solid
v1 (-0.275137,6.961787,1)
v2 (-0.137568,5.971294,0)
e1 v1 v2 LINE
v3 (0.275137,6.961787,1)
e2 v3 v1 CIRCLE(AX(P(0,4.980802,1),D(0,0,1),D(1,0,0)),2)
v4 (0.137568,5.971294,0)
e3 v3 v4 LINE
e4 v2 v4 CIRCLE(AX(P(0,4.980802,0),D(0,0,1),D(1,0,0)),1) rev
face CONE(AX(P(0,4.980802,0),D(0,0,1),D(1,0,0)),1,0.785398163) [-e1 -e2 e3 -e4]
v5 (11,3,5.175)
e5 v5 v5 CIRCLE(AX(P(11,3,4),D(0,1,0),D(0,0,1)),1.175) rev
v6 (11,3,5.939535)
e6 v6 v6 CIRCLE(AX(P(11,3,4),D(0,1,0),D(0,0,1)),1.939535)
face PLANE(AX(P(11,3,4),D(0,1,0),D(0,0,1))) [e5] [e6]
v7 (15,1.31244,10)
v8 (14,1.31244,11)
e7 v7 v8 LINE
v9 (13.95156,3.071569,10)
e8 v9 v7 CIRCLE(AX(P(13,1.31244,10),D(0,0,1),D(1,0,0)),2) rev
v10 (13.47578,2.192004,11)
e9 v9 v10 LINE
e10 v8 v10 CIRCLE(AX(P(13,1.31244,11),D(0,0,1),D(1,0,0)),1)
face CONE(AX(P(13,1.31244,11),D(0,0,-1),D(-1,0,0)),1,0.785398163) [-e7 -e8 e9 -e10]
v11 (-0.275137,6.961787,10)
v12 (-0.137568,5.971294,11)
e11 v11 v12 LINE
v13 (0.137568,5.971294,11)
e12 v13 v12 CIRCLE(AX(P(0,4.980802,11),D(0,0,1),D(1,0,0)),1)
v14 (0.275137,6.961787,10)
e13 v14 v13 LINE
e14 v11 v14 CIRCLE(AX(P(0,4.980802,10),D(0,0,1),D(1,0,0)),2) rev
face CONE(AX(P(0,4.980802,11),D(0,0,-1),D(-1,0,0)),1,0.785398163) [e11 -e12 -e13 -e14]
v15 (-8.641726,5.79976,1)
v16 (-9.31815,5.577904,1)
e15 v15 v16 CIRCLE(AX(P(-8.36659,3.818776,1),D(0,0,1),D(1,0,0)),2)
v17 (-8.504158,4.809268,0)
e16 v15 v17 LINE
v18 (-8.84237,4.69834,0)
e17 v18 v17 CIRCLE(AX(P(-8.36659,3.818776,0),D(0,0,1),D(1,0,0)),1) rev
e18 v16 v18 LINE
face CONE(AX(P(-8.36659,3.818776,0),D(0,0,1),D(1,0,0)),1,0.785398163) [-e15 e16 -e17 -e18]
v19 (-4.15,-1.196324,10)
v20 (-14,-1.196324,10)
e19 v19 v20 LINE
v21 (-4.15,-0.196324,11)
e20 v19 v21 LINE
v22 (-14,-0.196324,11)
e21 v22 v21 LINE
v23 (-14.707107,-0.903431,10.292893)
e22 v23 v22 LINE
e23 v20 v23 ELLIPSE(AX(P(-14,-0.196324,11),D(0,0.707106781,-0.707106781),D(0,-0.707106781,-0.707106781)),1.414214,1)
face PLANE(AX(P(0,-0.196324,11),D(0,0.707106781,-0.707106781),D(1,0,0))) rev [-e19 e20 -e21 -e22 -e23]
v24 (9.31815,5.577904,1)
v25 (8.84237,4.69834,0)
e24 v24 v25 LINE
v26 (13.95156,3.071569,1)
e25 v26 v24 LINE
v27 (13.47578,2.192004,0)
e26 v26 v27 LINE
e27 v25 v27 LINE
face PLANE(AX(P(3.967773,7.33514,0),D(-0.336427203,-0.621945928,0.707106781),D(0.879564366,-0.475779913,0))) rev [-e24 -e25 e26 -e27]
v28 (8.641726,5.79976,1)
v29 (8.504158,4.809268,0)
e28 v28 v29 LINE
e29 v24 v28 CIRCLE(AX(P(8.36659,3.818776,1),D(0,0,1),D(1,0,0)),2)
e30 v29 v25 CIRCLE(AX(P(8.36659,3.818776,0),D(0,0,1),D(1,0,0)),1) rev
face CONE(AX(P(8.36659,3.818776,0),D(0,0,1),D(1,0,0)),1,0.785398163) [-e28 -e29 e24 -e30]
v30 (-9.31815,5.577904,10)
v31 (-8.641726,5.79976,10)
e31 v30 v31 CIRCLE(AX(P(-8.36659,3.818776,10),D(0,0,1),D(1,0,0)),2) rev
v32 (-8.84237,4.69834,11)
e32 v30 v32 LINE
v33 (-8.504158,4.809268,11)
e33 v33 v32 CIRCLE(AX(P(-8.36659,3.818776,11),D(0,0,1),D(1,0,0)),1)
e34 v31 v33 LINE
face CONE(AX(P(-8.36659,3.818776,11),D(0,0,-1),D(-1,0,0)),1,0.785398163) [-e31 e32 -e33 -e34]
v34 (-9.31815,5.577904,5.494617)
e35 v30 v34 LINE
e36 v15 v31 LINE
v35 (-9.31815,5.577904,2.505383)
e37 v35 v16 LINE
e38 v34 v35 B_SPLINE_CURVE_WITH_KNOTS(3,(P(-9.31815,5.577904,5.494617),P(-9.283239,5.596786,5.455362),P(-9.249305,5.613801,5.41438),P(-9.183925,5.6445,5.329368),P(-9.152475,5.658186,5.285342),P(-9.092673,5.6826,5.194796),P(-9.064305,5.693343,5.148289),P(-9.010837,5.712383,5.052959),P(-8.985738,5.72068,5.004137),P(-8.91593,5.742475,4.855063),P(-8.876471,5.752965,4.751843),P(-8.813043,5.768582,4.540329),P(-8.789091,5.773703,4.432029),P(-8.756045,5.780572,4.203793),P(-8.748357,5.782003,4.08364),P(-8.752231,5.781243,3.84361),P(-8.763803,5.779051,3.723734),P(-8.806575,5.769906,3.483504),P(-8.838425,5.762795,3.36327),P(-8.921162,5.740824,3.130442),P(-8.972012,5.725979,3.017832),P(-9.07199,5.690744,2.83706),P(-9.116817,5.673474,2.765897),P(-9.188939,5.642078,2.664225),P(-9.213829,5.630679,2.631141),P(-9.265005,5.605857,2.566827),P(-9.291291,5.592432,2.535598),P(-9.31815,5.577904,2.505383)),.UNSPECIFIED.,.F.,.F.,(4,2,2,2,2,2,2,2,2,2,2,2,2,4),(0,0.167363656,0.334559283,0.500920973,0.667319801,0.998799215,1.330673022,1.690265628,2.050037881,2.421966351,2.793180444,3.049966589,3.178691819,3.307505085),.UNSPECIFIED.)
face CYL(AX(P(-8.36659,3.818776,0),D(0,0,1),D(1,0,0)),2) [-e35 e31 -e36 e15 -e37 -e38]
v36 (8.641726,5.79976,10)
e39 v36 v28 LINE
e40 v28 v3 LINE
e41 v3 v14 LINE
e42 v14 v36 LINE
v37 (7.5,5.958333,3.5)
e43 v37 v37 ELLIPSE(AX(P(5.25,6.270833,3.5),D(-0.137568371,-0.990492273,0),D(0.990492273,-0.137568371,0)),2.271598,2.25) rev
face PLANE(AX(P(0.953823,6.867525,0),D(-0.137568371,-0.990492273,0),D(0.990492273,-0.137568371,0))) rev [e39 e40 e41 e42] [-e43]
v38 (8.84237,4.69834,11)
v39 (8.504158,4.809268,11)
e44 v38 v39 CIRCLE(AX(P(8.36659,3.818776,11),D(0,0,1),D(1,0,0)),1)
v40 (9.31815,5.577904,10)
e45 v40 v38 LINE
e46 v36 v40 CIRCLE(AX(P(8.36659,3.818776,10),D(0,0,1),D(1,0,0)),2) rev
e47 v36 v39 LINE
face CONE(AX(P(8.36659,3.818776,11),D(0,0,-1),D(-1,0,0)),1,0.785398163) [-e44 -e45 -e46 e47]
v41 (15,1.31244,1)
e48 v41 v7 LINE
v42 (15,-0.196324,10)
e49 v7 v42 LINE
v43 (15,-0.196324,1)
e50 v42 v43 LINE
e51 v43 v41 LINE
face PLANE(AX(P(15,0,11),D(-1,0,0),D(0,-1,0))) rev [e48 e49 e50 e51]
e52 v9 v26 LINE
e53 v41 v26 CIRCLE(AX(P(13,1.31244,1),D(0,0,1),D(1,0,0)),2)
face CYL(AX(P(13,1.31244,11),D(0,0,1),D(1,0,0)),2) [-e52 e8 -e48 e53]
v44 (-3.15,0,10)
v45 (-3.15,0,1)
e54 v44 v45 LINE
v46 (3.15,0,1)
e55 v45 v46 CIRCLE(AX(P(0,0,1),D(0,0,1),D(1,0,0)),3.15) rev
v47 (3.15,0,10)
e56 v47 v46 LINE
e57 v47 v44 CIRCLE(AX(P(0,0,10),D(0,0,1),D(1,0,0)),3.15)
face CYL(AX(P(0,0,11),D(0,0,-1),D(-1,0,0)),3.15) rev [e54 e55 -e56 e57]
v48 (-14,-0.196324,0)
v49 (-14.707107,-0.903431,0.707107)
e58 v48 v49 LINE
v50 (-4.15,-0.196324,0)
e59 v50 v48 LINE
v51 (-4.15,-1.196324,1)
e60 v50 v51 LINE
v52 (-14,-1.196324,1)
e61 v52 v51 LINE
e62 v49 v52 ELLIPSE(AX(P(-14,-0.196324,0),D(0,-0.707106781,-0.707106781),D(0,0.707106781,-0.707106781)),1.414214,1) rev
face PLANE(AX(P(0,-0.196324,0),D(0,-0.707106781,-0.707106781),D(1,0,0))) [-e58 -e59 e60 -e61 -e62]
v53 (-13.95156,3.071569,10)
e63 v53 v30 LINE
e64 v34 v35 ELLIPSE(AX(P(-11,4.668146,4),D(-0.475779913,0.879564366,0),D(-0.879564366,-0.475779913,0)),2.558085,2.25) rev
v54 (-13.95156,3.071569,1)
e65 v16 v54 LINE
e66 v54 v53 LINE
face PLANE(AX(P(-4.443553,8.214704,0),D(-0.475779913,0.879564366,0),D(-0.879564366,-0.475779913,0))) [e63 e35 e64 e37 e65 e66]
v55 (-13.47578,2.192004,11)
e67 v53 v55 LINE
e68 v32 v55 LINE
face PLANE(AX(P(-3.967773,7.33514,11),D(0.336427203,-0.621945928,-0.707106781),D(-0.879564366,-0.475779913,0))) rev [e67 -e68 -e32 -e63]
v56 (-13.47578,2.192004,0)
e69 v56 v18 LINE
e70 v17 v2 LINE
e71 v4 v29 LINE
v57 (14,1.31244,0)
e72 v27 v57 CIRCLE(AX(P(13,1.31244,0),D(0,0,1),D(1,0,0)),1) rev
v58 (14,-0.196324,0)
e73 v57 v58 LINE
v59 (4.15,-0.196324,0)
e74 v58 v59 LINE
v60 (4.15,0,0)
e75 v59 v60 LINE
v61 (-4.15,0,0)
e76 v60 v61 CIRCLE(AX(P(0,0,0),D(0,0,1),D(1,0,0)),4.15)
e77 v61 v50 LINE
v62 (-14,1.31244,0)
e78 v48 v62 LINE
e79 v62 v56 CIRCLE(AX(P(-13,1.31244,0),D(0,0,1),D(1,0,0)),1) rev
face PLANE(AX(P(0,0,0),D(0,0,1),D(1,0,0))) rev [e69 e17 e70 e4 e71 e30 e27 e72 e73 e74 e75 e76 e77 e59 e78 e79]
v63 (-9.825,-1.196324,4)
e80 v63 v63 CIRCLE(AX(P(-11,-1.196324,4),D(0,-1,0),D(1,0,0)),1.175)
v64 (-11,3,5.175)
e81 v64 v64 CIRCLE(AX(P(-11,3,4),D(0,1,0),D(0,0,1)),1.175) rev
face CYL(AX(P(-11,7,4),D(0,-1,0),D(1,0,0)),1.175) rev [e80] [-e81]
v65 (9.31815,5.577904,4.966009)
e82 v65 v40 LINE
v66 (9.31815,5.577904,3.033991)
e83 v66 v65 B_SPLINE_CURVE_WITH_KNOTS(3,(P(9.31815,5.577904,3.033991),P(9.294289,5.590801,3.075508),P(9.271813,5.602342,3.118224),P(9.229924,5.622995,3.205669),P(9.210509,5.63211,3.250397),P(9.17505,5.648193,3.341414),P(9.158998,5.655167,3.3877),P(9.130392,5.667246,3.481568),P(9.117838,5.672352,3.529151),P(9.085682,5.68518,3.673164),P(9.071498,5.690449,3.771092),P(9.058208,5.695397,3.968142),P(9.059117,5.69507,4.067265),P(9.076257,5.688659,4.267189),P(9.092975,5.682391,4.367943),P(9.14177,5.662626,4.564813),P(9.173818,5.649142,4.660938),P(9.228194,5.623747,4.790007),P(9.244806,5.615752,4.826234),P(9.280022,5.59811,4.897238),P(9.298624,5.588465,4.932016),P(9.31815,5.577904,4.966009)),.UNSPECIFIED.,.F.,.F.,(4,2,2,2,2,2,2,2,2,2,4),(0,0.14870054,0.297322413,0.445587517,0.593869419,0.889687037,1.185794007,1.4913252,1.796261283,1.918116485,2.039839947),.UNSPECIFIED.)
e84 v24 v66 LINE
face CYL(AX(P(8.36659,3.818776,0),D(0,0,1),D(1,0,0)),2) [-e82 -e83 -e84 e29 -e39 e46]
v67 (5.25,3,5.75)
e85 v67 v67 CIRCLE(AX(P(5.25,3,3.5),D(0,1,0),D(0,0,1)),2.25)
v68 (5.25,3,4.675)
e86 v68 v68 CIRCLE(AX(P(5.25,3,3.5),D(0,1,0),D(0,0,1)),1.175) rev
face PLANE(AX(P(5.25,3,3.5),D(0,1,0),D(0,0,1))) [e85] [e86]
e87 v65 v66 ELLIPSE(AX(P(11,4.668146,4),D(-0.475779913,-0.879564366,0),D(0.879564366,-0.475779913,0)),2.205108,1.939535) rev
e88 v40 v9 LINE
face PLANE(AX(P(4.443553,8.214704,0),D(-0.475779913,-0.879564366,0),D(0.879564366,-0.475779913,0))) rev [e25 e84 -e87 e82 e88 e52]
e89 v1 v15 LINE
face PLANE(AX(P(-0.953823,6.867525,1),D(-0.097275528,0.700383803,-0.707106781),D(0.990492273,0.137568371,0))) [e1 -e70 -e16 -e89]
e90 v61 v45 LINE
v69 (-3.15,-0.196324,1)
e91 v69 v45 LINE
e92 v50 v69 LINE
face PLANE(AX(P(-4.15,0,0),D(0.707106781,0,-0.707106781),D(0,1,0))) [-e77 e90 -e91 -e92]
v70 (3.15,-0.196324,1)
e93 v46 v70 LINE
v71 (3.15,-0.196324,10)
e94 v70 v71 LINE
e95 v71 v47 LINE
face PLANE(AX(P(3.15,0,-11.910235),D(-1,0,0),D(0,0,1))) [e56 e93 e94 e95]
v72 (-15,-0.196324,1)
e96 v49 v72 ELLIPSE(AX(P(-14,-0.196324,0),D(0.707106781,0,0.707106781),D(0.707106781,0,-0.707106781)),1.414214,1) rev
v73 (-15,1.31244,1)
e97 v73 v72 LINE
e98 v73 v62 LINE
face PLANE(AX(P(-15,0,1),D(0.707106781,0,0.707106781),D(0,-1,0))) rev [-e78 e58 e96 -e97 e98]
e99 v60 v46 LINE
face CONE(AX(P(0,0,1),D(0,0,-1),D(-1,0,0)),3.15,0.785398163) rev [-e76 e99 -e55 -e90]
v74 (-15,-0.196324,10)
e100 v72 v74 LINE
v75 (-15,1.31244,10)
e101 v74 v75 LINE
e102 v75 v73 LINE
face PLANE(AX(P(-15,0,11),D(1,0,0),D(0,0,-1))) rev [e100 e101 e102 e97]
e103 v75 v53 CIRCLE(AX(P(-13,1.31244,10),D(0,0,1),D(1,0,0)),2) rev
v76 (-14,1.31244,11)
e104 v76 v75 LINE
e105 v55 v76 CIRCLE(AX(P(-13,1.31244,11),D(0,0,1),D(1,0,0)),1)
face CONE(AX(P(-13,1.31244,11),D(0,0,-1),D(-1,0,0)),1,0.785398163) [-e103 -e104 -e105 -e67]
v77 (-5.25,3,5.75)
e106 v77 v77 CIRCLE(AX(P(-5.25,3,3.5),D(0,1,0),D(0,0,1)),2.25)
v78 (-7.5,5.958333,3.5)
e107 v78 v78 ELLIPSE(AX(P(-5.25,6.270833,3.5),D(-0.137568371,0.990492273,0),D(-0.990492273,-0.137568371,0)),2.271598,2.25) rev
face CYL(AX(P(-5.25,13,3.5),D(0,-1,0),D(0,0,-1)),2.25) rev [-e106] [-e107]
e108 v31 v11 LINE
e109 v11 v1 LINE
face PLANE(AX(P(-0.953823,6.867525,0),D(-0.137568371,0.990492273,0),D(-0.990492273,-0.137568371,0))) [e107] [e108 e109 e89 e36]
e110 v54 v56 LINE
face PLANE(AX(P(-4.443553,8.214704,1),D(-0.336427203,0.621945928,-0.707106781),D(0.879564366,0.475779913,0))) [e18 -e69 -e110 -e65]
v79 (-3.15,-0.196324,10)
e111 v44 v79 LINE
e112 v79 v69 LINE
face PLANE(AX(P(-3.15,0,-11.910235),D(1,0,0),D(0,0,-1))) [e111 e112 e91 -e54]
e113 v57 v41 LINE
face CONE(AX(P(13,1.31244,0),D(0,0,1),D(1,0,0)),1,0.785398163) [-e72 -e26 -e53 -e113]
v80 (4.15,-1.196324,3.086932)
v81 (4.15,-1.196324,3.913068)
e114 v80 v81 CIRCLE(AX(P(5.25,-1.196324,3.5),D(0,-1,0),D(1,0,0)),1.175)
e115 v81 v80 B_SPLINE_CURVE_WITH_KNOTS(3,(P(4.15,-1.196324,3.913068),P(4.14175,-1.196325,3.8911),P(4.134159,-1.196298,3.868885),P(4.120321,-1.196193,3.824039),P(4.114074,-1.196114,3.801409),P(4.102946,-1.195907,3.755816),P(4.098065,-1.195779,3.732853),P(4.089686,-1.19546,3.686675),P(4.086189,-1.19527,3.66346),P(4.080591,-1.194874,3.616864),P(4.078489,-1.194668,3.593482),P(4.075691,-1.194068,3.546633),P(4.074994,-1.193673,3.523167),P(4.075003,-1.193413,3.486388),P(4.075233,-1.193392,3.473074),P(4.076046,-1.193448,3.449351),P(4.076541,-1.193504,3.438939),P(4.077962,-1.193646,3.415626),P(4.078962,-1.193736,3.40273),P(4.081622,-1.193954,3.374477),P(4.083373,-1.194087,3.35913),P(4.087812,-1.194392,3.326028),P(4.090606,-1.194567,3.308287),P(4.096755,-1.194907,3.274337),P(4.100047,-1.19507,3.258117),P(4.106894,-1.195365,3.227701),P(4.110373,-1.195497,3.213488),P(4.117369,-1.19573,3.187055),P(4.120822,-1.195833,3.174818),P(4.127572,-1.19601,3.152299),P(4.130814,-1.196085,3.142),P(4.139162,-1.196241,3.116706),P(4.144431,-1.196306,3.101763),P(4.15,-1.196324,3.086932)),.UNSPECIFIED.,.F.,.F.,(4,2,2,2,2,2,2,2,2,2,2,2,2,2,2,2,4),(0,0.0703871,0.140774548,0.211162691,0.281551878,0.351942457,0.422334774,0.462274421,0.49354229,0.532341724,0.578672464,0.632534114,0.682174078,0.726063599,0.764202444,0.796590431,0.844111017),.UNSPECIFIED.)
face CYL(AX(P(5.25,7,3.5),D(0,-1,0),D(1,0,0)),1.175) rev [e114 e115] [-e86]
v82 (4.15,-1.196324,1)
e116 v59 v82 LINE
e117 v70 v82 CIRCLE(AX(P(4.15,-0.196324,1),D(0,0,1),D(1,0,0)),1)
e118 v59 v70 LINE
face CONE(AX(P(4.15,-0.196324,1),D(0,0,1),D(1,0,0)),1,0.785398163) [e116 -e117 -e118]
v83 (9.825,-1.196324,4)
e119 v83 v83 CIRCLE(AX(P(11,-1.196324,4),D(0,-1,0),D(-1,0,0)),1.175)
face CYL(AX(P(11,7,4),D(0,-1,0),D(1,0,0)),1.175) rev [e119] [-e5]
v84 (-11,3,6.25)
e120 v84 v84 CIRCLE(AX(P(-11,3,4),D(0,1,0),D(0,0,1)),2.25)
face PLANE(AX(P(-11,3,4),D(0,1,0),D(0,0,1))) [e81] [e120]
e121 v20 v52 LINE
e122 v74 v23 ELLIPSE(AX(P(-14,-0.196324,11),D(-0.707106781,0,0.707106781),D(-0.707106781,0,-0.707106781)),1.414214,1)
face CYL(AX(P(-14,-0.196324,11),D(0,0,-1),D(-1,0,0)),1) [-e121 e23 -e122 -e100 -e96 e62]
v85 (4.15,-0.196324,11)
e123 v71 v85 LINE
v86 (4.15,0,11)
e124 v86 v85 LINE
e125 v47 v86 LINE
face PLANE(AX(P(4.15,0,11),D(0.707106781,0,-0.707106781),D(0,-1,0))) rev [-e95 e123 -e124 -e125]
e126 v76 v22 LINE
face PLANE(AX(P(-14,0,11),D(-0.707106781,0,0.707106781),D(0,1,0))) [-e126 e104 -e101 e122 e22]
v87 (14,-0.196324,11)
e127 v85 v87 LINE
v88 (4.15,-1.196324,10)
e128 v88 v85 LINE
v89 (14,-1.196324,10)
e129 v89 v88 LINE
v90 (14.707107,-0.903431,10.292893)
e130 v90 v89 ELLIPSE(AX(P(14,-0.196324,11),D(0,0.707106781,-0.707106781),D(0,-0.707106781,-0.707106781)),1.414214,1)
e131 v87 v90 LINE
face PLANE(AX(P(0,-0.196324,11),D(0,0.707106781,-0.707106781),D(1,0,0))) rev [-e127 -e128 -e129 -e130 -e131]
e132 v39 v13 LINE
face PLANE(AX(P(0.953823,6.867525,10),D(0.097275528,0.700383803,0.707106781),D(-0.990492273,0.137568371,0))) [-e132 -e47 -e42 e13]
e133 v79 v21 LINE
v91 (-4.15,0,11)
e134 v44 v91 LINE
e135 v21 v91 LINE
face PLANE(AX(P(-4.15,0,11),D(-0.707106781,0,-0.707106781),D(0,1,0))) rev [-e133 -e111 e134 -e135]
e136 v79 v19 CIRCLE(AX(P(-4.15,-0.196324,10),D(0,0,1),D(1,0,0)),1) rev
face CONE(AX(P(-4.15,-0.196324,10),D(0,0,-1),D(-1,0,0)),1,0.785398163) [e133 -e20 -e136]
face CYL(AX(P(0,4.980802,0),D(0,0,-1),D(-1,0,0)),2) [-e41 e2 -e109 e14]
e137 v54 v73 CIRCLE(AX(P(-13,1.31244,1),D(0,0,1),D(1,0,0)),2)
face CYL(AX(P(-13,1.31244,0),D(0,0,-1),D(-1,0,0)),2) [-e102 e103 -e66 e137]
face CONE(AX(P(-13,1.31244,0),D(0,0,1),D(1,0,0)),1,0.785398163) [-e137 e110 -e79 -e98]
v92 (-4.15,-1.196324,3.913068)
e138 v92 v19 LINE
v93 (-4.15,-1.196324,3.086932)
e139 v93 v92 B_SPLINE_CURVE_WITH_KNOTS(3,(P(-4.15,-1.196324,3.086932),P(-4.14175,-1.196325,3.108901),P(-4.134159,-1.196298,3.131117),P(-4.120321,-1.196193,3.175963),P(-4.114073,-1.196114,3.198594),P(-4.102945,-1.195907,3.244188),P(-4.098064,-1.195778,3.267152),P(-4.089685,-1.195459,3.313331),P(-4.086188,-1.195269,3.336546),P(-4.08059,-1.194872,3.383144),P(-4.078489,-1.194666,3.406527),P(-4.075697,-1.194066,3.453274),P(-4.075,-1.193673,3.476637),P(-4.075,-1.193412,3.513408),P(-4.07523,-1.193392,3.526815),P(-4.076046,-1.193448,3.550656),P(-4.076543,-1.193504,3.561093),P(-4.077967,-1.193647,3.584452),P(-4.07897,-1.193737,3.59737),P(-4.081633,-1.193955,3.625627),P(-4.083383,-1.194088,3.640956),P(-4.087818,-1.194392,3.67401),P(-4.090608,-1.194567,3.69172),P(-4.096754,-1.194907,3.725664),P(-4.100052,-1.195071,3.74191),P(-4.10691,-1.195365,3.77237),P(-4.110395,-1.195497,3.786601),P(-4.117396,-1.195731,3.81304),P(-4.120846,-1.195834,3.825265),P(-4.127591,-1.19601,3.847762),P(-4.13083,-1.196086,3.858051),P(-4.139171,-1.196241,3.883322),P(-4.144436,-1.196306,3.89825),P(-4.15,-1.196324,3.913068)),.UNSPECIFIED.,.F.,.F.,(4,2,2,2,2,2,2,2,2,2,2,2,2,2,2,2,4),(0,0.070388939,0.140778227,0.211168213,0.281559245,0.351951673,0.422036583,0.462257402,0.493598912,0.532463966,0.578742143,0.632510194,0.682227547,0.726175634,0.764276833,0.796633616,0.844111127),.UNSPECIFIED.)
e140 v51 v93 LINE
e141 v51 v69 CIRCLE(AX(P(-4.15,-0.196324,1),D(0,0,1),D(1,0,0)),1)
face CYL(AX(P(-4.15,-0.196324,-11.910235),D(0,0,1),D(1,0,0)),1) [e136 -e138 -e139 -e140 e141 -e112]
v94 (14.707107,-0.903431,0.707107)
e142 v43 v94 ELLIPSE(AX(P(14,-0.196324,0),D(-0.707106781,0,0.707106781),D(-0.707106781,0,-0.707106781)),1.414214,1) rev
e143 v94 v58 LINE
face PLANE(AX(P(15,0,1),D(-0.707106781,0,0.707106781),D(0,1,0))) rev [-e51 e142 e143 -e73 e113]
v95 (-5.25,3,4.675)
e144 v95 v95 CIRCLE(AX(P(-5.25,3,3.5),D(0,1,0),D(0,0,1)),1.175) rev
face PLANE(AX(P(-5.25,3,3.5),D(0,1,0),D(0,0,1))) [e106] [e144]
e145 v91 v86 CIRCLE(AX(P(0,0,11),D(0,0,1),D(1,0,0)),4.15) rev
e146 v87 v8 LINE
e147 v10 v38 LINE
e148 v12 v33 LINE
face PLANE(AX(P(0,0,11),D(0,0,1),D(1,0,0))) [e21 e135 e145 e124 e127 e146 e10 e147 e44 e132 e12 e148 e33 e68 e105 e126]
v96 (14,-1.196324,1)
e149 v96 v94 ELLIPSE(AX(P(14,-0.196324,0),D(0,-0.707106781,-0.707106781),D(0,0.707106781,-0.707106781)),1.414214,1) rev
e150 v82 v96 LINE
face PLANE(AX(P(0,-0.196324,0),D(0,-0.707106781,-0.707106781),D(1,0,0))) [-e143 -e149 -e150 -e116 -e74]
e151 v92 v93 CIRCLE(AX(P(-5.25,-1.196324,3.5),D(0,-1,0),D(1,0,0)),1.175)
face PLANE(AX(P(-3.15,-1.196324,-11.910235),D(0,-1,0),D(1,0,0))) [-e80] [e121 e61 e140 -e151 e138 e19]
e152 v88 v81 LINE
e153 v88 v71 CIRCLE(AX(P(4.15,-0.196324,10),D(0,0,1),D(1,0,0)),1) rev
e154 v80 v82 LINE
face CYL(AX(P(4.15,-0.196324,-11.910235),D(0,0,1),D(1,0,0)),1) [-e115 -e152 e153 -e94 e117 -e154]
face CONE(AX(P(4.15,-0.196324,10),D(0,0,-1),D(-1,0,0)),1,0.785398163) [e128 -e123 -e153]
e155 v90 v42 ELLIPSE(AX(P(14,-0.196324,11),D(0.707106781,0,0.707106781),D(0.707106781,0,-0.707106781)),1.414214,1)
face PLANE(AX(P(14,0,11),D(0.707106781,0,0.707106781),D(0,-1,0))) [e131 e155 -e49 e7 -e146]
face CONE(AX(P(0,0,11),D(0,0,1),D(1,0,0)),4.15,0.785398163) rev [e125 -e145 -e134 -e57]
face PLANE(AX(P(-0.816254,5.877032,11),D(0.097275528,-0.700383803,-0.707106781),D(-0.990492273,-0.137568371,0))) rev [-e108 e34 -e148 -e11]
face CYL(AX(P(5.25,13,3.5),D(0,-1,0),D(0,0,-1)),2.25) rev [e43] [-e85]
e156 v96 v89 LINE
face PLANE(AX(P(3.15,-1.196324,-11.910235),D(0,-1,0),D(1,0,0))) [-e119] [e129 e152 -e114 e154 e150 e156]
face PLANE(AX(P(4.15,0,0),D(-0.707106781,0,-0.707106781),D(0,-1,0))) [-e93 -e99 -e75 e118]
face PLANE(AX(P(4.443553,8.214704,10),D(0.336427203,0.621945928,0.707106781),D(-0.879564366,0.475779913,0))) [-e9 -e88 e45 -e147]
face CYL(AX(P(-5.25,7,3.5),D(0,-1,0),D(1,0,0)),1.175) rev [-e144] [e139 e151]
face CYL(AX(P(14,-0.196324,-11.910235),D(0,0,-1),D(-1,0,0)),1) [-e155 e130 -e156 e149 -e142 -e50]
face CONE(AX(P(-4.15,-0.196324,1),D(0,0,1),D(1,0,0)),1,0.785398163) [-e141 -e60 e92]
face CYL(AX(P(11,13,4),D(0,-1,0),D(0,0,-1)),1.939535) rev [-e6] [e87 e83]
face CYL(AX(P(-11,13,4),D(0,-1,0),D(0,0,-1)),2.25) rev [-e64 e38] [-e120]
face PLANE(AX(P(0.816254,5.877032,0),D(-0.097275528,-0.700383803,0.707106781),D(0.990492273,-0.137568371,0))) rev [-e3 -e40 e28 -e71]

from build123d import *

# Parameters (mm, degrees)
BOSS_EXTRUDE1_DEPTH     = 11
CUT_EXTRUDE1_DEPTH      = 20.874606914
CUT_EXTRUDE1_DEPTH_BACK = 20.874606914
SKETCH3_W               = 11.85
SKETCH3_H               = 1.196323822
BOSS_EXTRUDE2_DEPTH     = 11
CHAMFER1_SIZE           = 1
FILLET1_R               = 1
SKETCH4_R               = 1.175
CUT_EXTRUDE2_DEPTH      = 21.326822777
CUT_EXTRUDE3_START      = 3
SKETCH5_R               = 2.25
SKETCH5_R_2             = 1.939534676
CUT_EXTRUDE3_DEPTH      = 10
FILLET2_R               = 2
FILLET3_R               = 1
CHAMFER2_SIZE           = 1


# Some blends are built 0.0001 mm under size
with BuildPart() as part:
    # Sketch1 → Boss-Extrude1 (new body)
    with BuildSketch(Plane.XY):
        with BuildLine():
            Line((-3.15, 0), (-15, 0))
            Line((-15, 0), (-15, 7))
            Line((-15, 7), (15, 7))
            Line((15, 7), (15, 0))
            Line((15, 0), (3.15, 0))
            ThreePointArc((3.15, 0), (0, 3.15), (-3.15, 0))
        make_face()
    extrude(amount=BOSS_EXTRUDE1_DEPTH)

    # Sketch2 → Cut-Extrude1 (cut, two sides: drawn at the far end of the back side and taken through both)
    with BuildSketch(Plane.XY.offset(11).offset(-CUT_EXTRUDE1_DEPTH_BACK)):
        Polygon((-9, 5.75), (0, 7), (-15, 7), (-15, 2.504439372), align=None)
        Polygon((15, 7), (0, 7), (9, 5.75), (15, 2.504439372), align=None)
    extrude(amount=CUT_EXTRUDE1_DEPTH + CUT_EXTRUDE1_DEPTH_BACK, mode=Mode.SUBTRACT)

    # Sketch3 → Boss-Extrude2 (add)
    with BuildSketch(Plane.XY.offset(11)):
        with Locations((-9.075, -0.598161911)):
            Rectangle(SKETCH3_W, SKETCH3_H)
        with Locations((9.075, -0.598161911)):
            Rectangle(SKETCH3_W, SKETCH3_H)
    extrude(amount=-BOSS_EXTRUDE2_DEPTH)

    # Chamfer1
    chamfer1_edges = [part.edges().sort_by_distance(p)[0] for p in [
        (15, 0.654057775, 11),
        (-15, 0.654057775, 0),
        (-15, 0.654057775, 11),
        (15, 0.654057775, 0),
    ]]
    chamfer(chamfer1_edges, length=CHAMFER1_SIZE)

    # Fillet1
    fillet1_edges = [part.edges().sort_by_distance(p)[0] for p in [
        (-3.15, -1.196323822, 5.5),
        (3.15, -1.196323822, 5.5),
    ]]
    fillet(fillet1_edges, radius=FILLET1_R)

    # Sketch4 → Cut-Extrude2 (cut, through all)
    with BuildSketch(Plane.XZ.offset(1.196323822)):
        with Locations(Location((-5.25, 3.5, 0), (0, 0, 20.581969212))):
            Circle(SKETCH4_R)
        with Locations((5.25, 3.5)):
            Circle(SKETCH4_R)
        with Locations((-11, 4)):
            Circle(SKETCH4_R)
        with Locations((11, 4)):
            Circle(SKETCH4_R)
    extrude(amount=-CUT_EXTRUDE2_DEPTH, mode=Mode.SUBTRACT)

    # Sketch5 → Cut-Extrude3 (cut)
    with BuildSketch(Plane(origin=(0, 0, 0), x_dir=(1, 0, 0), z_dir=(0, 1, 0)).offset(CUT_EXTRUDE3_START)):
        with Locations(Location((-5.25, -3.5, 0), (0, 0, 180))):
            Circle(SKETCH5_R)
        with Locations((5.25, -3.5)):
            Circle(SKETCH5_R)
        with Locations(Location((-11, -4, 0), (0, 0, 27.266044451))):
            Circle(SKETCH5_R)
        with Locations((11, -4)):
            Circle(SKETCH5_R_2)
    extrude(amount=CUT_EXTRUDE3_DEPTH, mode=Mode.SUBTRACT)

    # Fillet2
    # the kernel refuses this fillet: 2 mm, written as the material it takes off along each edge
    with BuildSketch(Plane(origin=(9, 5.75, -2.170275709), x_dir=(-0.9904922731777516, 0.13756837127468827, 0), z_dir=(0, 0, 1))) as fillet2_piece_1:
        with BuildLine():
            CenterArc((FILLET2_R * 0.180856309082, FILLET2_R), FILLET2_R, 249.497020474, 20.502979526)
            Line((-FILLET2_R * 0.169399781042, FILLET2_R * 0.0633460236933), (-FILLET2_R * 0.176404902844, FILLET2_R * 0.0446129441672))
            Line((-FILLET2_R * 0.176404902844, FILLET2_R * 0.0446129441672), (-FILLET2_R * 0.00361712618164, -FILLET2_R * 0.02))
            Line((-FILLET2_R * 0.00361712618164, -FILLET2_R * 0.02), (FILLET2_R * 0.180856309082, -FILLET2_R * 0.02))
            Line((FILLET2_R * 0.180856309082, -FILLET2_R * 0.02), (FILLET2_R * 0.180856309082, 0))
        make_face()
    extrude(amount=15.340551418, mode=Mode.SUBTRACT)
    with BuildSketch(Plane(origin=(-9, 5.75, 5.139499303), x_dir=(-0.879564366325619, -0.4757799128696085, 0), z_dir=(0, 0, -1))) as fillet2_piece_2:
        with BuildLine():
            CenterArc((FILLET2_R * 0.180856309082, -FILLET2_R), FILLET2_R, 90, 20.502979526)
            Line((-FILLET2_R * 0.169399781042, -FILLET2_R * 0.0633460236933), (-FILLET2_R * 0.176404902844, -FILLET2_R * 0.0446129441672))
            Line((-FILLET2_R * 0.176404902844, -FILLET2_R * 0.0446129441672), (-FILLET2_R * 0.00361712618164, FILLET2_R * 0.02))
            Line((-FILLET2_R * 0.00361712618164, FILLET2_R * 0.02), (FILLET2_R * 0.180856309082, FILLET2_R * 0.02))
            Line((FILLET2_R * 0.180856309082, FILLET2_R * 0.02), (FILLET2_R * 0.180856309082, 0))
        make_face()
    extrude(amount=7.309775012, mode=Mode.SUBTRACT)
    with BuildSketch(Plane(origin=(-9, 5.75, 13.170275709), x_dir=(-0.879564366325619, -0.4757799128696085, 0), z_dir=(0, 0, -1))) as fillet2_piece_3:
        with BuildLine():
            CenterArc((FILLET2_R * 0.180856309082, -FILLET2_R), FILLET2_R, 90, 20.502979526)
            Line((-FILLET2_R * 0.169399781042, -FILLET2_R * 0.0633460236933), (-FILLET2_R * 0.176404902844, -FILLET2_R * 0.0446129441672))
            Line((-FILLET2_R * 0.176404902844, -FILLET2_R * 0.0446129441672), (-FILLET2_R * 0.00361712618164, FILLET2_R * 0.02))
            Line((-FILLET2_R * 0.00361712618164, FILLET2_R * 0.02), (FILLET2_R * 0.180856309082, FILLET2_R * 0.02))
            Line((FILLET2_R * 0.180856309082, FILLET2_R * 0.02), (FILLET2_R * 0.180856309082, 0))
        make_face()
    extrude(amount=10.309775012, mode=Mode.SUBTRACT)
    with BuildSketch(Plane(origin=(0, 7, 12.666666667), x_dir=(-0.9904922731777517, -0.13756837127468774, 0), z_dir=(0, 0, -1))) as fillet2_piece_4:
        with BuildLine():
            CenterArc((FILLET2_R * 0.138888888889, -FILLET2_R), FILLET2_R, 90, 15.814325406)
            Line((-FILLET2_R * 0.133631928674, -FILLET2_R * 0.0378501135503), (-FILLET2_R * 0.139082345025, -FILLET2_R * 0.0186071158213))
            Line((-FILLET2_R * 0.139082345025, -FILLET2_R * 0.0186071158213), (-FILLET2_R * 0.00277777777778, FILLET2_R * 0.02))
            Line((-FILLET2_R * 0.00277777777778, FILLET2_R * 0.02), (FILLET2_R * 0.138888888889, FILLET2_R * 0.02))
            Line((FILLET2_R * 0.138888888889, FILLET2_R * 0.02), (FILLET2_R * 0.138888888889, 0))
        make_face()
    extrude(amount=14.333333333, mode=Mode.SUBTRACT)
    with BuildSketch(Plane(origin=(-15, 2.504439372, -6.151996245), x_dir=(0.8795643663256194, 0.4757799128696078, 0), z_dir=(0, 0, 1))) as fillet2_piece_5:
        with BuildLine():
            CenterArc((FILLET2_R * 0.595999687118, -FILLET2_R), FILLET2_R, 90, 61.589857771)
            Line((-FILLET2_R * 0.283564679207, -FILLET2_R * 0.52422008713), (-FILLET2_R * 0.301155966534, -FILLET2_R * 0.514704488873))
            Line((-FILLET2_R * 0.301155966534, -FILLET2_R * 0.514704488873), (-FILLET2_R * 0.0119199937424, FILLET2_R * 0.02))
            Line((-FILLET2_R * 0.0119199937424, FILLET2_R * 0.02), (FILLET2_R * 0.595999687118, FILLET2_R * 0.02))
            Line((FILLET2_R * 0.595999687118, FILLET2_R * 0.02), (FILLET2_R * 0.595999687118, 0))
        make_face()
    extrude(amount=23.303992491, mode=Mode.SUBTRACT)
    with BuildSketch(Plane(origin=(15, 2.504439372, -6.151996245), x_dir=(-0.87956436632562, 0.47577991286960686, 0), z_dir=(0, 0, 1))) as fillet2_piece_6:
        with BuildLine():
            CenterArc((FILLET2_R * 0.595999687118, FILLET2_R), FILLET2_R, 208.410142229, 61.589857771)
            Line((-FILLET2_R * 0.283564679207, FILLET2_R * 0.52422008713), (-FILLET2_R * 0.301155966534, FILLET2_R * 0.514704488873))
            Line((-FILLET2_R * 0.301155966534, FILLET2_R * 0.514704488873), (-FILLET2_R * 0.0119199937424, -FILLET2_R * 0.02))
            Line((-FILLET2_R * 0.0119199937424, -FILLET2_R * 0.02), (FILLET2_R * 0.595999687118, -FILLET2_R * 0.02))
            Line((FILLET2_R * 0.595999687118, -FILLET2_R * 0.02), (FILLET2_R * 0.595999687118, 0))
        make_face()
    extrude(amount=23.303992491, mode=Mode.SUBTRACT)

    # Fillet3
    fillet3_edges = [part.edges().sort_by_distance(p)[0] for p in [
        (15, -1.196323822, 5.5),
        (-15, -1.196323822, 5.5),
    ]]
    fillet(fillet3_edges, radius=FILLET3_R)

    # Chamfer2
    chamfer2_edges = [part.edges().sort_by_distance(p)[0] for p in [
        (-11.634854678, 4.324736566, 0),
        (-11.634854678, 4.324736566, 11),
        (-8.989888283, 5.719170071, 0),
        (-8.989888283, 5.719170071, 11),
        (-4.458431595, 6.38077339, 0),
        (-4.458431595, 6.38077339, 11),
        (11.634854678, 4.324736566, 11),
        (11.634854678, 4.324736566, 0),
        (0, 6.980802017, 0),
        (0, 6.980802017, 11),
        (8.989888283, 5.719170071, 0),
        (8.989888283, 5.719170071, 11),
        (4.458431595, 6.38077339, 11),
        (4.458431595, 6.38077339, 0),
        (-9.075, -1.196323822, 0),
        (9.075, -1.196323822, 0),
        (-3.442893219, -0.903430603, 0),
        (-3.442893219, -0.903430603, 11),
        (3.442893219, -0.903430603, 11),
        (3.442893219, -0.903430603, 0),
        (-3.15, -0.098161911, 0),
        (3.15, -0.098161911, 0),
        (0, 3.15, 0),
        (0, 3.15, 11),
        (-9.075, -1.196323822, 11),
        (9.075, -1.196323822, 11),
        (-3.15, -0.098161911, 11),
        (3.15, -0.098161911, 11),
        (-13.975873835, 3.058197787, 0),
        (-13.975873835, 3.058197787, 11),
        (13.975873835, 3.058197787, 0),
        (13.975873835, 3.058197787, 11),
    ]]
    chamfer(chamfer2_edges, length=CHAMFER2_SIZE - 0.0001)  # a hair under: the kernel refuses the full size


solid = part.part
